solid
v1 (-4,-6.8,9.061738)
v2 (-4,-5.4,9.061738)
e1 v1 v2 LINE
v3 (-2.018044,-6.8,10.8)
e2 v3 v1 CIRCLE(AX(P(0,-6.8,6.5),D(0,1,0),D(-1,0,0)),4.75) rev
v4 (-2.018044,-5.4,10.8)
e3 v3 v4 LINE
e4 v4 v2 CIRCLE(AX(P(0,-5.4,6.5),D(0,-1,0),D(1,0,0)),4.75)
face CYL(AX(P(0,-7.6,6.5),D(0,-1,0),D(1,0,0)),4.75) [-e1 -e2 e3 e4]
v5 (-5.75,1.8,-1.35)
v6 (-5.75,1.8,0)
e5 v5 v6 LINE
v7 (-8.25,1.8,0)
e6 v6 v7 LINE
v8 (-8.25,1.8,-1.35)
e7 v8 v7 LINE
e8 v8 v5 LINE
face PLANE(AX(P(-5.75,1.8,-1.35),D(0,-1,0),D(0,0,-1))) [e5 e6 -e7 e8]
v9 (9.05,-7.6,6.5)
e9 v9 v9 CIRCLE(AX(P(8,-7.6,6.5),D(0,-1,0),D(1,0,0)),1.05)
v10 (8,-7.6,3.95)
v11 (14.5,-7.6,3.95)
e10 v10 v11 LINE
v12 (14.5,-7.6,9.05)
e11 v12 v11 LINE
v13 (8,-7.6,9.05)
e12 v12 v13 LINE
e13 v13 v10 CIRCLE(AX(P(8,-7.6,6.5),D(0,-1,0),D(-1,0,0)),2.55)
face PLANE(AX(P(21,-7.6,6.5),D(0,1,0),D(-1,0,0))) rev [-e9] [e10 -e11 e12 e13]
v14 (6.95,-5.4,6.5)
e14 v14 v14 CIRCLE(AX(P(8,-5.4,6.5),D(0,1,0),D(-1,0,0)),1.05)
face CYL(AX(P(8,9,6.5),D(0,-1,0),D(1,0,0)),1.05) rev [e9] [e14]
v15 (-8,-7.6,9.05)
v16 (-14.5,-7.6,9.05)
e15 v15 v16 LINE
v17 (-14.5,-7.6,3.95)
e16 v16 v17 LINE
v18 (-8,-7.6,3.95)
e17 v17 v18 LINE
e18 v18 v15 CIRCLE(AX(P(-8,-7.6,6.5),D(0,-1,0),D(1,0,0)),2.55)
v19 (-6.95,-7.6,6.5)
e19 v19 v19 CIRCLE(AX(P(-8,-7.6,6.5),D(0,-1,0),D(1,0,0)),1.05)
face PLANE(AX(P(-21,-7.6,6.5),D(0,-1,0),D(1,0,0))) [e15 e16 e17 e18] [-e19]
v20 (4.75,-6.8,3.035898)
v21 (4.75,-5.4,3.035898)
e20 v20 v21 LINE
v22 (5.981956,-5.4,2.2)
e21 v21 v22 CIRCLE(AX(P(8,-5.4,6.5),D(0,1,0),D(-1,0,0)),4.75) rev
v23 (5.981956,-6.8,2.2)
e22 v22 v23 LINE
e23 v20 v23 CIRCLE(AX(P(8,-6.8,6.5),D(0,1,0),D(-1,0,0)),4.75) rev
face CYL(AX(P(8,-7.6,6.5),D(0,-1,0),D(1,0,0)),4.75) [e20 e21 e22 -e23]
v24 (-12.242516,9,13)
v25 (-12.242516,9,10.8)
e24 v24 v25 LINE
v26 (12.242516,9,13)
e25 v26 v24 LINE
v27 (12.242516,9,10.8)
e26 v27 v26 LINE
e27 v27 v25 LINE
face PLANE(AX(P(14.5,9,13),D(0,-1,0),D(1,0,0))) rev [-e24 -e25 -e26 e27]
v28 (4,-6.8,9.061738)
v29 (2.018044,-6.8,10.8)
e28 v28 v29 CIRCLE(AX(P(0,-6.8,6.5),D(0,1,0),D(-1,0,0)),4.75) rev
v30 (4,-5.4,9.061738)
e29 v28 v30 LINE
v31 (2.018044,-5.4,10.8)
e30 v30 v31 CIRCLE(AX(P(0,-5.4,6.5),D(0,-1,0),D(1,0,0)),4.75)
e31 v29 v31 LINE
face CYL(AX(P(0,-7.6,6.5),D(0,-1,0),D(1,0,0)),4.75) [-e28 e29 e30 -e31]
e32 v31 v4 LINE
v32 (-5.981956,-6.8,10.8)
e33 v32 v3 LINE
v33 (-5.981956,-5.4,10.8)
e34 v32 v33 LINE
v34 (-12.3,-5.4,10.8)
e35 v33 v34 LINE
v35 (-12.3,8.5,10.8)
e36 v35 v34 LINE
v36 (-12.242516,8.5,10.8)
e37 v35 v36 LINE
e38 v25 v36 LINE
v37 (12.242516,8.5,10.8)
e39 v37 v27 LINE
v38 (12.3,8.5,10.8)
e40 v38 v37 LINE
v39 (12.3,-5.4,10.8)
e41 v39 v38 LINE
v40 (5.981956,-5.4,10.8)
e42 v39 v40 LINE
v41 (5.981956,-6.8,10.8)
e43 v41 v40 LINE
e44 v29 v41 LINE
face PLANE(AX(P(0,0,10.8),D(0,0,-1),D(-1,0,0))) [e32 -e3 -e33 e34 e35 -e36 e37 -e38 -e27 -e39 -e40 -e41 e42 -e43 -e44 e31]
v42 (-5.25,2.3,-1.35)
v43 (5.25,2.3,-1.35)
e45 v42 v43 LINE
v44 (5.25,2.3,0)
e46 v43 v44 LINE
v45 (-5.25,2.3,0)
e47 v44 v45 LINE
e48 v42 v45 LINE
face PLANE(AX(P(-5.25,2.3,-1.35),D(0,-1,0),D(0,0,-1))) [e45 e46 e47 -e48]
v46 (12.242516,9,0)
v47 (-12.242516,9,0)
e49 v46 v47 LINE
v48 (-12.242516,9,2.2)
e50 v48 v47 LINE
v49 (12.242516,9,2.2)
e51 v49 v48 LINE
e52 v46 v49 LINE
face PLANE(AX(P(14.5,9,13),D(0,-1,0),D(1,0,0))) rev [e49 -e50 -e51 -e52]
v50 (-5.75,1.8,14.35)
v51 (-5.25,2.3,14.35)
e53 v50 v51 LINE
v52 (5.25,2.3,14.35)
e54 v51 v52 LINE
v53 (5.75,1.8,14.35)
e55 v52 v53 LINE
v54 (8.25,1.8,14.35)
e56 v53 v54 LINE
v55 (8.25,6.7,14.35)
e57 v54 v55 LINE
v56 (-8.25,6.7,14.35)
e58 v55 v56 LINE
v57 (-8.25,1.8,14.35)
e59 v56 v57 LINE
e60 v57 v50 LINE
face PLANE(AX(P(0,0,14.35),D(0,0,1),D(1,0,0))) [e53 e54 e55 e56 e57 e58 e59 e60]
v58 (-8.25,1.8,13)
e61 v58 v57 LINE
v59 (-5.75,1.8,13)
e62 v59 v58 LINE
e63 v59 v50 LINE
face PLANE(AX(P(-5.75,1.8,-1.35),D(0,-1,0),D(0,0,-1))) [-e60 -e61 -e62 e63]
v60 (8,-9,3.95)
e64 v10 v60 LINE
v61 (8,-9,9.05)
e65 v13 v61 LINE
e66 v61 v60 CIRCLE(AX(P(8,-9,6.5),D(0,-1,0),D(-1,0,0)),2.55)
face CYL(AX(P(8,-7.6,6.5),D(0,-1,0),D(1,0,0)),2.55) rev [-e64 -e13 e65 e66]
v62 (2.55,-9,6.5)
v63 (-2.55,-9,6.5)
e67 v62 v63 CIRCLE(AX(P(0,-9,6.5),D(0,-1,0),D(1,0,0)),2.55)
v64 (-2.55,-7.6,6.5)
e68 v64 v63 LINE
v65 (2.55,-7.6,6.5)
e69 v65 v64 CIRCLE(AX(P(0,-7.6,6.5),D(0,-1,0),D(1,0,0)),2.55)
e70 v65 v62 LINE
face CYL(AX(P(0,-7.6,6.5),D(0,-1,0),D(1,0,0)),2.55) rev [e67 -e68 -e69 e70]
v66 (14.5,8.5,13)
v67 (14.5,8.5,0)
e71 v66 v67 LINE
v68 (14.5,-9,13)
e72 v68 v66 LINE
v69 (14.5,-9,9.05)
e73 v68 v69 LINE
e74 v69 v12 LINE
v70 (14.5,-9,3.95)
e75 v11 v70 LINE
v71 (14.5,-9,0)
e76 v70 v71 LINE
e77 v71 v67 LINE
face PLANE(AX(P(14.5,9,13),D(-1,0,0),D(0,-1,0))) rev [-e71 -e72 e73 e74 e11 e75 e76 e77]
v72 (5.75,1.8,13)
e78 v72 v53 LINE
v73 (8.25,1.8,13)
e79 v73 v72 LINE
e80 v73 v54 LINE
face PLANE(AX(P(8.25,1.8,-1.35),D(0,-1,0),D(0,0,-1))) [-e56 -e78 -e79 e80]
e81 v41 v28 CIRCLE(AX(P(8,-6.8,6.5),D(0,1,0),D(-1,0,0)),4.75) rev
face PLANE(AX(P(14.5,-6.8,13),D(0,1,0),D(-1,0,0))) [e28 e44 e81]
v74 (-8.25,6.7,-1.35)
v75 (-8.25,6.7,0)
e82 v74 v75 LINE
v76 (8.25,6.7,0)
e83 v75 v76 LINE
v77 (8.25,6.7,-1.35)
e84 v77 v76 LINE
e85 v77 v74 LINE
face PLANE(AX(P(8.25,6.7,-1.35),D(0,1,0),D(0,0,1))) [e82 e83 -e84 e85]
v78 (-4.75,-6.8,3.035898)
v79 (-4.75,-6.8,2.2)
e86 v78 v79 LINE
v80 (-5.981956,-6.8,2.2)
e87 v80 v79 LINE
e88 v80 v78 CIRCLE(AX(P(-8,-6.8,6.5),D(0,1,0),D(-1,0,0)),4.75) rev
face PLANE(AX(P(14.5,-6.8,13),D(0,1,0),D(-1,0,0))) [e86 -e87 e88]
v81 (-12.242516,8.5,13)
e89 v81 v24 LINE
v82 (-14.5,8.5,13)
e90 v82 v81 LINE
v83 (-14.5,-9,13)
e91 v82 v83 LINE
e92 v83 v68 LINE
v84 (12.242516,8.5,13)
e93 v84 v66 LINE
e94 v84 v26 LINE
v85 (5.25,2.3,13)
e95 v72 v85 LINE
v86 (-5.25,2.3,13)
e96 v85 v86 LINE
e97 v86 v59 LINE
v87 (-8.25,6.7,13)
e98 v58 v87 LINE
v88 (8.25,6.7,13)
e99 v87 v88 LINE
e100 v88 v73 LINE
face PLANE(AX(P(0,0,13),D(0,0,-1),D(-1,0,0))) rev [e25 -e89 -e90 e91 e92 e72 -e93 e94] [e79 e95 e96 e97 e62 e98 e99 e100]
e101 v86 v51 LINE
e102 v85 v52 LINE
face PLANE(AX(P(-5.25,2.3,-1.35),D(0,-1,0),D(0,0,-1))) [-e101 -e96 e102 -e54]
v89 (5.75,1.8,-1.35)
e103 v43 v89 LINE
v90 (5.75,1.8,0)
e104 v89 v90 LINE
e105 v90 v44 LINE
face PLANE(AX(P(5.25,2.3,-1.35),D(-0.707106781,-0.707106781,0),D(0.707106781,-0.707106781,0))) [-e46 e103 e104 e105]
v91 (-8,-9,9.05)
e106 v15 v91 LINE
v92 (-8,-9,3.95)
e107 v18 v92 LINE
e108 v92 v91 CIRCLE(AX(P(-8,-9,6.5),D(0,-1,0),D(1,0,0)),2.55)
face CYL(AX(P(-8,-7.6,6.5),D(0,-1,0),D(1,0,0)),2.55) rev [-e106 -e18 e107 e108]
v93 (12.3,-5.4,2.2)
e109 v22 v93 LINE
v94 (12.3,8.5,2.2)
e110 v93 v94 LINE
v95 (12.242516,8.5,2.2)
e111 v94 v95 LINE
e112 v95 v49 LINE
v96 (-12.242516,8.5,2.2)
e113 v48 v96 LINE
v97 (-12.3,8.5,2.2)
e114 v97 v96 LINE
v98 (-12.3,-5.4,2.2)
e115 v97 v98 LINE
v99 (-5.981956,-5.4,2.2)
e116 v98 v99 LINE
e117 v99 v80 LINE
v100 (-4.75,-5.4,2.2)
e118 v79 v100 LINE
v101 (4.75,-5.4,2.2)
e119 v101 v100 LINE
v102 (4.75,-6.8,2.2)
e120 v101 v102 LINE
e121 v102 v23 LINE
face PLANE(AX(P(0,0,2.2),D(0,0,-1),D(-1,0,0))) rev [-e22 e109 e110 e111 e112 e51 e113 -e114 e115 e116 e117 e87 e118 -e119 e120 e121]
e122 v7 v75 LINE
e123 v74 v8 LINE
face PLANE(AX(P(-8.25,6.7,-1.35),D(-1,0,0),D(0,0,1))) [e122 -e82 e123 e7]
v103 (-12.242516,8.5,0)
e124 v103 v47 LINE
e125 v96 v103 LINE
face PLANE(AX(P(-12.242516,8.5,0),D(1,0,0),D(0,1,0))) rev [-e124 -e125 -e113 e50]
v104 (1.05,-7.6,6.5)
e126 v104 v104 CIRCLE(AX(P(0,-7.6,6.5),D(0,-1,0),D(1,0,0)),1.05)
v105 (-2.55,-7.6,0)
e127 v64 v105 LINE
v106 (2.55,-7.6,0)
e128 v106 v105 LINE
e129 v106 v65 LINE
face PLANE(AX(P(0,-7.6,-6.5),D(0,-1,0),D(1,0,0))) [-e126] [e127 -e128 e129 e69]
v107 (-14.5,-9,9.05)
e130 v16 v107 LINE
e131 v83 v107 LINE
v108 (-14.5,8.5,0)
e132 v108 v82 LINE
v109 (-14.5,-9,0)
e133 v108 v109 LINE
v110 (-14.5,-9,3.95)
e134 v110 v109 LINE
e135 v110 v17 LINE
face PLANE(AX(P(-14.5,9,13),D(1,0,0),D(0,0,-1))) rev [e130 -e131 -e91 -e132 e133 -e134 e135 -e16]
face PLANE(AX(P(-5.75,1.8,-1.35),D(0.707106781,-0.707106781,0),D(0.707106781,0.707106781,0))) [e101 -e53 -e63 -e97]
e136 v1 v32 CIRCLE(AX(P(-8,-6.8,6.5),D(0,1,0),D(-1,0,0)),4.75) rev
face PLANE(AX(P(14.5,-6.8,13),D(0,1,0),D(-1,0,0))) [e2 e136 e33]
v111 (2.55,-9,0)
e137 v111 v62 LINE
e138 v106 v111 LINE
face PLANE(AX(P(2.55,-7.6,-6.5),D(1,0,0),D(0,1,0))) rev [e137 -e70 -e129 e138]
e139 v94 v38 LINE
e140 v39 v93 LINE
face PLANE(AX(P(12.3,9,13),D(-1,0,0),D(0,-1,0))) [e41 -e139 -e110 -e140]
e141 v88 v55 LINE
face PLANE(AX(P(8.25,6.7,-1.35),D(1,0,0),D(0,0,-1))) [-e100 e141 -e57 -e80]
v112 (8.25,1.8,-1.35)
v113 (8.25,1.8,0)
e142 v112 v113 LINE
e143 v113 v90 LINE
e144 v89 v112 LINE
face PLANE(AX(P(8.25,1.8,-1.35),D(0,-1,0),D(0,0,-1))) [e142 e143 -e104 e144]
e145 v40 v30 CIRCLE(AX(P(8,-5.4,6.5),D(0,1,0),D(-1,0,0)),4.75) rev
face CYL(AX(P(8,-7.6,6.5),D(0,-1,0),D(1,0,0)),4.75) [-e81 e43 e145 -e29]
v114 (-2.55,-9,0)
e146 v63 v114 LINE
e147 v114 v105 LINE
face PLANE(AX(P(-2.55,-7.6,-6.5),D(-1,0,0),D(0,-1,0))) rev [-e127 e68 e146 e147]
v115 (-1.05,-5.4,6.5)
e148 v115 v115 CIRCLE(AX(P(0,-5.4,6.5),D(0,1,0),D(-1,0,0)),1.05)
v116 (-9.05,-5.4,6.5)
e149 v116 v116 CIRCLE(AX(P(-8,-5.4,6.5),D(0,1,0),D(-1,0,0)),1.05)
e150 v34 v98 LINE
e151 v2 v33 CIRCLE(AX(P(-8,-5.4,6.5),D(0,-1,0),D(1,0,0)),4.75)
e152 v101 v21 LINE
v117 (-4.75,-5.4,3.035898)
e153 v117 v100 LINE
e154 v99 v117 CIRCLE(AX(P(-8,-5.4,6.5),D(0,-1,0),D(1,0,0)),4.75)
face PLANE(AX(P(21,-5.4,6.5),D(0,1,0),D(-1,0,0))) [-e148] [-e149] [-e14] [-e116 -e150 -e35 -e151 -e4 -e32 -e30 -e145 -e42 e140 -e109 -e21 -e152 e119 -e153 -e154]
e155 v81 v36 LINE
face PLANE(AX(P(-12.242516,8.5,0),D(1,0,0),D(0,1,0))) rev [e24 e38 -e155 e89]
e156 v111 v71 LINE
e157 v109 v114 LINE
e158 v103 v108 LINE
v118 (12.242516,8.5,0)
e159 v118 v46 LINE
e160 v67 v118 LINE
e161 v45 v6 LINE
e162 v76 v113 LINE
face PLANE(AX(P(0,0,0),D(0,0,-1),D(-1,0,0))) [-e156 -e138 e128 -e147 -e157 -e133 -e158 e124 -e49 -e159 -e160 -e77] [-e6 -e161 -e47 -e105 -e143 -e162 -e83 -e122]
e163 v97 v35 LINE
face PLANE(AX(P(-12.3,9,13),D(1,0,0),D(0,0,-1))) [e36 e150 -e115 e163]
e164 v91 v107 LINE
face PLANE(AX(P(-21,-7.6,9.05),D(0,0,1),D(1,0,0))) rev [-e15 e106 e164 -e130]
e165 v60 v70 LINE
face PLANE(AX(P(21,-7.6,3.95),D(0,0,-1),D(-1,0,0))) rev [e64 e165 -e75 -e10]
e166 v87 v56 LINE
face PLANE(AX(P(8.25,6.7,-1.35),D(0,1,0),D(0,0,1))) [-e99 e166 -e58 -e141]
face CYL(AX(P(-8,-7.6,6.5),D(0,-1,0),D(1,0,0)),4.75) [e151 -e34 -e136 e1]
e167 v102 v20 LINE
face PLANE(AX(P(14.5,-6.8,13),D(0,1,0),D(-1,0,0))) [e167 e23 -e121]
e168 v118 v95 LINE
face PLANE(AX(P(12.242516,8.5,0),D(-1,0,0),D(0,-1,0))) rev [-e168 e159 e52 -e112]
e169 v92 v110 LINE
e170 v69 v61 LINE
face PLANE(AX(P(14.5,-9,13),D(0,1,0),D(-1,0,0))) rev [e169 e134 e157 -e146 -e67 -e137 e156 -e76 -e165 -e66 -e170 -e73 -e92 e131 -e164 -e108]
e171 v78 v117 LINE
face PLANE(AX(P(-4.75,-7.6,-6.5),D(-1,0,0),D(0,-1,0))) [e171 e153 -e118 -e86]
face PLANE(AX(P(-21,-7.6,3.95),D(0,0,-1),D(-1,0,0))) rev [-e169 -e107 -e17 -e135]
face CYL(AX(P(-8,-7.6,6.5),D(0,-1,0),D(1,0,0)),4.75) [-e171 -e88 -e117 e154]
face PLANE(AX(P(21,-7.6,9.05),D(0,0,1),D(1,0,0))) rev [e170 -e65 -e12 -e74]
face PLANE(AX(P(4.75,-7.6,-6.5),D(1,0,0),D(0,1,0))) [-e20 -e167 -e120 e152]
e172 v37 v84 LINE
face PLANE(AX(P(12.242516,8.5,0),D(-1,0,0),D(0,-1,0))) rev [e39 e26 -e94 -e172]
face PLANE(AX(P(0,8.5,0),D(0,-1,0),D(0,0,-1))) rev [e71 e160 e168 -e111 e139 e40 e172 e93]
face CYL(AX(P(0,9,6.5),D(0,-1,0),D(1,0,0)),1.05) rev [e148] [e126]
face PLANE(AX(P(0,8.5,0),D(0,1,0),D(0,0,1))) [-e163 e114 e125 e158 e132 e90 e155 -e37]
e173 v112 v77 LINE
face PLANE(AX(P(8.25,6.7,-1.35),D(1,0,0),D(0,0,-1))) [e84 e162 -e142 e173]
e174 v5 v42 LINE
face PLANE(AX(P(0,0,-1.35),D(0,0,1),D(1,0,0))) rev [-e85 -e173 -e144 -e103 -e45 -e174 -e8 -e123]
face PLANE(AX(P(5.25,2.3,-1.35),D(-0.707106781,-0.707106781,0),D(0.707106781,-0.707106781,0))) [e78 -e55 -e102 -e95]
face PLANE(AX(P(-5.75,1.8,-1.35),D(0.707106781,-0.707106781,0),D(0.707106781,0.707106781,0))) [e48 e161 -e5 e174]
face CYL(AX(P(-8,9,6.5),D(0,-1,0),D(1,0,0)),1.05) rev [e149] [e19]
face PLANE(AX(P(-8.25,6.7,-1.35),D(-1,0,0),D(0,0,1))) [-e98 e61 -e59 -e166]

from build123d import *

# Parameters (mm, degrees)
SKETCH1_W                = 29
SKETCH1_H                = 18
BOSS_EXTRUDE1_DEPTH      = 13
BOSS_EXTRUDE2_DEPTH      = 1.35
BOSS_EXTRUDE2_DEPTH_BACK = 14.35
CUT_EXTRUDE1_DEPTH       = 1.4
SHELL1_START             = -5.4
SHELL1_OUTLINE_W         = 24.6
SHELL1_OUTLINE_H         = 8.6
SHELL1_DEPTH             = 14.4
SHELL1_START_2           = -6.8
SHELL1_2_DEPTH           = 1.4
SKETCH4_R                = 1.05
CUT_EXTRUDE2_DEPTH       = 27.300807972
SKETCH5_W                = 2.257483773
SKETCH5_H                = 13
CUT_EXTRUDE3_DEPTH       = 0.5


# Read off the part's stored shape, not the designer's step: Shell1
with BuildPart() as part:
    # Sketch1 → Boss-Extrude1 (new body)
    with BuildSketch(Plane.XY):
        Rectangle(SKETCH1_W, SKETCH1_H)
    extrude(amount=BOSS_EXTRUDE1_DEPTH)

    # Sketch2 → Boss-Extrude2 (add, two sides: drawn at the far end of the back side and taken through both)
    with BuildSketch(Plane.XY.offset(13).offset(-BOSS_EXTRUDE2_DEPTH_BACK)):
        Polygon((-5.75, 1.8), (-5.25, 2.3), (5.25, 2.3), (5.75, 1.8), (8.25, 1.8), (8.25, 6.7), (-8.25, 6.7), (-8.25, 1.8), align=None)
    extrude(amount=BOSS_EXTRUDE2_DEPTH + BOSS_EXTRUDE2_DEPTH_BACK)

    # Sketch3 → Cut-Extrude1 (cut)
    with BuildSketch(Plane.XZ.offset(9)):
        with BuildLine():
            Line((-2.55, -6.5), (-2.55, 6.5))
            ThreePointArc((-2.55, 6.5), (0, 9.05), (2.55, 6.5))
            Line((2.55, 6.5), (2.55, -6.5))
            ThreePointArc((2.55, -6.5), (0, -9.05), (-2.55, -6.5))
        make_face()
        with BuildLine():
            Line((-21, 9.05), (-8, 9.05))
            ThreePointArc((-8, 9.05), (-5.45, 6.5), (-8, 3.95))
            Line((-8, 3.95), (-21, 3.95))
            ThreePointArc((-21, 3.95), (-23.55, 6.5), (-21, 9.05))
        make_face()
        with BuildLine():
            Line((21, 9.05), (8, 9.05))
            ThreePointArc((8, 9.05), (5.45, 6.5), (8, 3.95))
            Line((8, 3.95), (21, 3.95))
            ThreePointArc((21, 3.95), (23.55, 6.5), (21, 9.05))
        make_face()
    extrude(amount=-CUT_EXTRUDE1_DEPTH, mode=Mode.SUBTRACT)

    # Shell1 outline → Shell1 (cut)
    with BuildSketch(Plane(origin=(0, 0, 0), x_dir=(1, 0, 0), z_dir=(0, 1, 0)).offset(SHELL1_START)):
        with Locations((0, -6.5)):
            Rectangle(SHELL1_OUTLINE_W, SHELL1_OUTLINE_H)
    extrude(amount=SHELL1_DEPTH, mode=Mode.SUBTRACT)

    # Shell1 2 outline → Shell1 2 (cut)
    with BuildSketch(Plane(origin=(0, 0, 0), x_dir=(1, 0, 0), z_dir=(0, 1, 0)).offset(SHELL1_START_2)):
        with BuildLine():
            Line((2.018043607, -10.8), (5.981956393, -10.8))
            ThreePointArc((5.981956393, -10.8), (4.867971715, -10.071120108), (4, -9.061737691))
            ThreePointArc((4, -9.061737691), (3.132028285, -10.071120108), (2.018043607, -10.8))
        make_face()
        with BuildLine():
            ThreePointArc((4.75, -3.035898385), (5.333025611, -2.569383304), (5.981956393, -2.2))
            Line((5.981956393, -2.2), (4.75, -2.2))
            Line((4.75, -2.2), (4.75, -3.035898385))
        make_face()
        with BuildLine():
            Line((-5.981956393, -10.8), (-2.018043607, -10.8))
            ThreePointArc((-2.018043607, -10.8), (-3.132028285, -10.071120108), (-4, -9.061737691))
            ThreePointArc((-4, -9.061737691), (-4.867971715, -10.071120108), (-5.981956393, -10.8))
        make_face()
        with BuildLine():
            Line((-4.75, -3.035898385), (-4.75, -2.2))
            Line((-4.75, -2.2), (-5.981956393, -2.2))
            ThreePointArc((-5.981956393, -2.2), (-5.333025611, -2.569383304), (-4.75, -3.035898385))
        make_face()
    extrude(amount=SHELL1_2_DEPTH, mode=Mode.SUBTRACT)

    # Sketch4 → Cut-Extrude2 (cut, through all)
    with BuildSketch(Plane.XZ.offset(7.6)):
        with Locations((0, 6.5)):
            Circle(SKETCH4_R)
        with Locations((-8, 6.5)):
            Circle(SKETCH4_R)
        with Locations((8, 6.5)):
            Circle(SKETCH4_R)
    extrude(amount=-CUT_EXTRUDE2_DEPTH, mode=Mode.SUBTRACT)

    # Sketch5 → Cut-Extrude3 (cut)
    with BuildSketch(Plane(origin=(0, 9, 0), x_dir=(1, 0, 0), z_dir=(0, 1, 0))):
        with Locations((-13.371258114, -6.5)):
            Rectangle(SKETCH5_W, SKETCH5_H)
        with Locations((13.371258114, -6.5)):
            Rectangle(SKETCH5_W, SKETCH5_H)
    extrude(amount=-CUT_EXTRUDE3_DEPTH, mode=Mode.SUBTRACT)


solid = part.part
